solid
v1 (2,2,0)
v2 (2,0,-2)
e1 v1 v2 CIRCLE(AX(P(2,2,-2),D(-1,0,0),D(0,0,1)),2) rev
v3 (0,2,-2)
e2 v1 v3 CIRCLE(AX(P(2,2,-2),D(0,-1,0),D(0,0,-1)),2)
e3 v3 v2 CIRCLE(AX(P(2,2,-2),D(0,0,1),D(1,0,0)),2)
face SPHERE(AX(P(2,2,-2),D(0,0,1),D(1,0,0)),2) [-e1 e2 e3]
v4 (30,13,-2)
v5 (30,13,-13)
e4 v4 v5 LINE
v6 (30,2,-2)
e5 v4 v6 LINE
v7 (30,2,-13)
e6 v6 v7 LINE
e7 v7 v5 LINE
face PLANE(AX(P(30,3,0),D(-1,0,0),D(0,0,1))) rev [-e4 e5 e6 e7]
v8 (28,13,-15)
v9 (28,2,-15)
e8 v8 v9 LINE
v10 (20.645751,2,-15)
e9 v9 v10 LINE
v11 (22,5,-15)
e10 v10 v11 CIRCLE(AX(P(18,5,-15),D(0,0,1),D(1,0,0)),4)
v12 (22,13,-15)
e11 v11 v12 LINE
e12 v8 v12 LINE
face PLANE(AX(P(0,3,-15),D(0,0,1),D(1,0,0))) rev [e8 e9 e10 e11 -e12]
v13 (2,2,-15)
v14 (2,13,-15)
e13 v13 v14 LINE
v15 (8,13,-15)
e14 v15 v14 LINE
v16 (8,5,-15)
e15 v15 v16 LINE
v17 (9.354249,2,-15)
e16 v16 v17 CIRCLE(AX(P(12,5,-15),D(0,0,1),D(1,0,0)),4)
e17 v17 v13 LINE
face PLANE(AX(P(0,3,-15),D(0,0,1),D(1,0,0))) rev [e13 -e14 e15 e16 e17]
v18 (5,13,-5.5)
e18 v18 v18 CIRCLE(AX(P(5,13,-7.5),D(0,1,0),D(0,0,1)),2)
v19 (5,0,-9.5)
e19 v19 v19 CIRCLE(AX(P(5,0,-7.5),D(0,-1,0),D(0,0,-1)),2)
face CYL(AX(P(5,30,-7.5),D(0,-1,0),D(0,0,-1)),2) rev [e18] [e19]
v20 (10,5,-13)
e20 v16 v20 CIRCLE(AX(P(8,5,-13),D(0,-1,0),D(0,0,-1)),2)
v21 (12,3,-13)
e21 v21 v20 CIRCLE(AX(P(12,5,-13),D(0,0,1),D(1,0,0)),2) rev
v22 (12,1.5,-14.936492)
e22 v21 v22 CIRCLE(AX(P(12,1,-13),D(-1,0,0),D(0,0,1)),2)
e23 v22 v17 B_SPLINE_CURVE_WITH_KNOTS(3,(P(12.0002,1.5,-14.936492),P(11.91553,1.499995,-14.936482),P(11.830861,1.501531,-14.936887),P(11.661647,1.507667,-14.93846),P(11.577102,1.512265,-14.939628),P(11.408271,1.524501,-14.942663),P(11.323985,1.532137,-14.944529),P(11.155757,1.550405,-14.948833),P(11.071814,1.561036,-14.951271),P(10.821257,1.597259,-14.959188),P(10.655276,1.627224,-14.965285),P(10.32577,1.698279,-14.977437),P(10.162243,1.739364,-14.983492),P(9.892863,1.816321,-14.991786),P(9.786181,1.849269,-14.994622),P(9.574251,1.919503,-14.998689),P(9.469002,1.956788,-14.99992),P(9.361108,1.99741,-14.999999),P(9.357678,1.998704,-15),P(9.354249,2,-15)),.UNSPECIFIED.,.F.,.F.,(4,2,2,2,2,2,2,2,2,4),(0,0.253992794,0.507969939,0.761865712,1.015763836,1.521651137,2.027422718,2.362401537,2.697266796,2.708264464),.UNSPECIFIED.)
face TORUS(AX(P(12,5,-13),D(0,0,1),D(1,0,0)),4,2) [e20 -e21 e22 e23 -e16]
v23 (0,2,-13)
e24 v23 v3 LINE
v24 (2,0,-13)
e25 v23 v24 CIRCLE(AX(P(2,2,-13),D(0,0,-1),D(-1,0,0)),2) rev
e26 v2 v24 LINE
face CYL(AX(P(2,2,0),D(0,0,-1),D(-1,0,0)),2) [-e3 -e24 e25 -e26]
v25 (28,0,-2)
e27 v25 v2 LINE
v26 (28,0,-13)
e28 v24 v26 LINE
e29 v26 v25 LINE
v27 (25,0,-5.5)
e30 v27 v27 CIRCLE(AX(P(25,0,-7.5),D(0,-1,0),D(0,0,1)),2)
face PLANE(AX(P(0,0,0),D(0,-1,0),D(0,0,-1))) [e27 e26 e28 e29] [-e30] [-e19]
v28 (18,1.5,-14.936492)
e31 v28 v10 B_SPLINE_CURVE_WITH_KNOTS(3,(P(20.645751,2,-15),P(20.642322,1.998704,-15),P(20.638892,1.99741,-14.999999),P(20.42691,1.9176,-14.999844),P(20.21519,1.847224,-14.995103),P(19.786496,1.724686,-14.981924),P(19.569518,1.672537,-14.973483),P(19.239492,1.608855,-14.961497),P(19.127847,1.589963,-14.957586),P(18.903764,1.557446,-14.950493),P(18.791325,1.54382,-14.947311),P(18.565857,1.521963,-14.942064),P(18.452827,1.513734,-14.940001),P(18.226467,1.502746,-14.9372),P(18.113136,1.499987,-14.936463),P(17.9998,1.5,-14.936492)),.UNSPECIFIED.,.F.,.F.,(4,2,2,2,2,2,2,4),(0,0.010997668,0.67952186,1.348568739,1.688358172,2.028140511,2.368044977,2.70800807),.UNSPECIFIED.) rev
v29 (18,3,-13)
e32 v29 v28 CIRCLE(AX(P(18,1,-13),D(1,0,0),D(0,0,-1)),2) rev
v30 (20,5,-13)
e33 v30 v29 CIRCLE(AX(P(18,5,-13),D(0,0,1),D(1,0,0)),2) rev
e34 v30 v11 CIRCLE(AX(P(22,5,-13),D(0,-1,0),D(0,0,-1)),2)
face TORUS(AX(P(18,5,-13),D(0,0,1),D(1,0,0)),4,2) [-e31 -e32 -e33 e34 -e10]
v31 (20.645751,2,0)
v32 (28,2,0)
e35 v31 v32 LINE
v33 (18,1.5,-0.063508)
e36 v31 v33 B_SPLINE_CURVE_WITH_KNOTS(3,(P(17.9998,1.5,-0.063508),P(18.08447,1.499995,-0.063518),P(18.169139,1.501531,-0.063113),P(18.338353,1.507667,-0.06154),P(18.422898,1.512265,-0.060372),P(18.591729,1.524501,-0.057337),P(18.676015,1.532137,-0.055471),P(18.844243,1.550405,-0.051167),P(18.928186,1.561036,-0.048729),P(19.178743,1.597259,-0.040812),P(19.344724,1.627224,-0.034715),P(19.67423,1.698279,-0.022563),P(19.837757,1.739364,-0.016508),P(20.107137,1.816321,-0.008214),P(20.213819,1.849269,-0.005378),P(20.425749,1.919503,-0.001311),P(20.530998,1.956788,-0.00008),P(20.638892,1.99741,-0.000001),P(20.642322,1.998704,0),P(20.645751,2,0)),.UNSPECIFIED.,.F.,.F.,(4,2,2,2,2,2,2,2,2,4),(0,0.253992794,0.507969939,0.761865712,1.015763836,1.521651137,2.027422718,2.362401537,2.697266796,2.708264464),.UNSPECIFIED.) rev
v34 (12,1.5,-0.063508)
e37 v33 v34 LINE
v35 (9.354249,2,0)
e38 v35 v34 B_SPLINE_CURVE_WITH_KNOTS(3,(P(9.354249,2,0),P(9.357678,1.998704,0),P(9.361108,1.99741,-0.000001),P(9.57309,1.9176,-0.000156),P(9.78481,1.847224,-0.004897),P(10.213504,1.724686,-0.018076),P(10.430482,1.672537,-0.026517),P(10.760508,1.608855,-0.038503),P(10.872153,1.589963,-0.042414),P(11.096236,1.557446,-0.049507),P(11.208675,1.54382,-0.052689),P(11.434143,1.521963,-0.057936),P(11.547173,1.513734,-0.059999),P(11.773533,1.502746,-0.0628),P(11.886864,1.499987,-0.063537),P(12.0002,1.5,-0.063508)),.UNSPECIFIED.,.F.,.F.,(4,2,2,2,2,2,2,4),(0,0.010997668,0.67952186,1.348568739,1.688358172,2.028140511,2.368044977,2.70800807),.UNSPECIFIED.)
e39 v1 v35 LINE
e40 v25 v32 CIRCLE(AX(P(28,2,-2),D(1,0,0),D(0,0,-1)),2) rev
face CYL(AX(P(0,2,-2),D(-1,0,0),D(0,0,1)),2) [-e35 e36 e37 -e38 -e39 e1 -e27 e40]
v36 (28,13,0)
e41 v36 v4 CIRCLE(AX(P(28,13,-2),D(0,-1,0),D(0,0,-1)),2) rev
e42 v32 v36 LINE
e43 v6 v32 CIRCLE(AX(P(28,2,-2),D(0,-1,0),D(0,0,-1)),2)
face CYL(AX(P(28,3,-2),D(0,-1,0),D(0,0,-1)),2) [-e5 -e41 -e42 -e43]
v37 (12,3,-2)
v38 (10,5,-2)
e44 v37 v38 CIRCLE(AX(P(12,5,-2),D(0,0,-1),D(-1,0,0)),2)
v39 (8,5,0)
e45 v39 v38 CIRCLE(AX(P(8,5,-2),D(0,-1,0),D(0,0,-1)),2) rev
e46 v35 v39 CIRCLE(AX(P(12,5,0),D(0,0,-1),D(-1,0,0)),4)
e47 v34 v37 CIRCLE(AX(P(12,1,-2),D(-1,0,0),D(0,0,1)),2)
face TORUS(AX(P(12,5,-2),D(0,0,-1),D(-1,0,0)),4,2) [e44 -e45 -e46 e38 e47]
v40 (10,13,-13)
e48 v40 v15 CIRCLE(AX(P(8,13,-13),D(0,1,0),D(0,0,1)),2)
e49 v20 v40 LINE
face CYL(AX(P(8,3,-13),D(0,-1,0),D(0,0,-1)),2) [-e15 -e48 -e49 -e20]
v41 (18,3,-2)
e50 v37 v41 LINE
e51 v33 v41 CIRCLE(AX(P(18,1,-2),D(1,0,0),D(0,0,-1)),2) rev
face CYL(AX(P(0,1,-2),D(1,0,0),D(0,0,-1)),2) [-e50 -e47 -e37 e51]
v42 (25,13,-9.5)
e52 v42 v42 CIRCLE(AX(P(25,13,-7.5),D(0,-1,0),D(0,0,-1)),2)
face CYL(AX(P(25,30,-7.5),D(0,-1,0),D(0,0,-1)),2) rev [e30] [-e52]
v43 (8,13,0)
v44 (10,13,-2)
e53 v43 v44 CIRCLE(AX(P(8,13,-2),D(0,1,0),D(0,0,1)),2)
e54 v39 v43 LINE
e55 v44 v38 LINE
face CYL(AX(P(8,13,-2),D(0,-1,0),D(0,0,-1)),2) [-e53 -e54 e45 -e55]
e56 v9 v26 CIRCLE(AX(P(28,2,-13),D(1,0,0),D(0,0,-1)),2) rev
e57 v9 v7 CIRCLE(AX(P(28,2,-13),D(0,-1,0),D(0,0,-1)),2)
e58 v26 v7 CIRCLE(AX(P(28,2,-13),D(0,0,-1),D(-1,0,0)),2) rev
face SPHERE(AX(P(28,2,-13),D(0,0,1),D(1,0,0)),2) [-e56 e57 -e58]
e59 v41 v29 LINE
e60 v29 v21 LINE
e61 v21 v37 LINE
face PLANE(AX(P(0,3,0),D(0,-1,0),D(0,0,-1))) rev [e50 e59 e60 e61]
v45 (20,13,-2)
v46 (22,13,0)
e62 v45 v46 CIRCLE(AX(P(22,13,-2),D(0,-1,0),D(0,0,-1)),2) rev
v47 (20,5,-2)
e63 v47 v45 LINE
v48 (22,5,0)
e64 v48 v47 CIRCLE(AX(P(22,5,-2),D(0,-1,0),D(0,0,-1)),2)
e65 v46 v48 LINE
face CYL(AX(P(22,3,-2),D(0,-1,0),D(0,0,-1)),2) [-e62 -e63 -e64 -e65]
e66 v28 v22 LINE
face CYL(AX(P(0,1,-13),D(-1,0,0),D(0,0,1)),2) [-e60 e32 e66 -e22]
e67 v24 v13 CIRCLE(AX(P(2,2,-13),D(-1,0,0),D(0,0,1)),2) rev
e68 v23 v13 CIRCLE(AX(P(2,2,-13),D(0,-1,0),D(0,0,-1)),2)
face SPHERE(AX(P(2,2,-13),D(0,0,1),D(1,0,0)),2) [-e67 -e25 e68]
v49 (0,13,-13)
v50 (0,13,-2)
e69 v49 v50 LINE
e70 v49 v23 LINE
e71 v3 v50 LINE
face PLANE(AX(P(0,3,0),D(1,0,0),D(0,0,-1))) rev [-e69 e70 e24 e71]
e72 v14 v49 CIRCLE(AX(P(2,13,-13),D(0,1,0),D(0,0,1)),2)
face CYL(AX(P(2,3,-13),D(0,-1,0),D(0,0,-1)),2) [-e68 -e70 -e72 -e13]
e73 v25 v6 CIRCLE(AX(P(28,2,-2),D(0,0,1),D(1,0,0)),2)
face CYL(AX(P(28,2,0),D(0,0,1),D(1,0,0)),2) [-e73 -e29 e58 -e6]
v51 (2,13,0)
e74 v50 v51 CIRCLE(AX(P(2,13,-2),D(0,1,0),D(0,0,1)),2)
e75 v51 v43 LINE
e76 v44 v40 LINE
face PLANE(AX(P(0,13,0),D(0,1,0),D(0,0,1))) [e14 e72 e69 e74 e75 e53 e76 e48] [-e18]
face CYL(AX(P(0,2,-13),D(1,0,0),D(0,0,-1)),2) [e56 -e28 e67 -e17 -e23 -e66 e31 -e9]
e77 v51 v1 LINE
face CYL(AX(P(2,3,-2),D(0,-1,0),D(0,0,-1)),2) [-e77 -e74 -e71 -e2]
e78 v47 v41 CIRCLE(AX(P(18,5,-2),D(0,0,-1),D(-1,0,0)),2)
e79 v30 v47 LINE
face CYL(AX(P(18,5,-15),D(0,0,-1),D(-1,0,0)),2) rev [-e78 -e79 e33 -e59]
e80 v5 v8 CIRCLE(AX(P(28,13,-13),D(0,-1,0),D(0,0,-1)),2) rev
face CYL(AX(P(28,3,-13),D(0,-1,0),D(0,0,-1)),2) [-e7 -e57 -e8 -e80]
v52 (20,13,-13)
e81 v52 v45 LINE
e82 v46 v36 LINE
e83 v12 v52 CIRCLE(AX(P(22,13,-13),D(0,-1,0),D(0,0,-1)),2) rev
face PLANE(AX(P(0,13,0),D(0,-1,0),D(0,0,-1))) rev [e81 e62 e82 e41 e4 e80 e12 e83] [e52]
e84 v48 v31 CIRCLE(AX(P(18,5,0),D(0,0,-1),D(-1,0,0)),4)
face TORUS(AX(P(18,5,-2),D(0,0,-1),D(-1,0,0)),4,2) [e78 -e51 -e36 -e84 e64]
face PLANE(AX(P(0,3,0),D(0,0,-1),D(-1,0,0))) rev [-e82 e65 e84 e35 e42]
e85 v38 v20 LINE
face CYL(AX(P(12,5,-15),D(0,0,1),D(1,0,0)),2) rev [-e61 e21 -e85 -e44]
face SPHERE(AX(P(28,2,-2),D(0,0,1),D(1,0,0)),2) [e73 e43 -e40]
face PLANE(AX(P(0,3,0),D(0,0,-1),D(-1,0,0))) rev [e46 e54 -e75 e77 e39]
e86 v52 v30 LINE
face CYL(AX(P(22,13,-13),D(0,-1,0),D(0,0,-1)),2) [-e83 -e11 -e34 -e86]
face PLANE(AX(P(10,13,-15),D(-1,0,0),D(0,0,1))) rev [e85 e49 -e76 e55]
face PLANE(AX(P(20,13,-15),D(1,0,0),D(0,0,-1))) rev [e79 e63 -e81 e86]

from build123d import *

# Parameters (mm, degrees)
SKETCH1_W           = 30
SKETCH1_H           = 15
BOSS_EXTRUDE1_DEPTH = 3
SKETCH2_W           = 10
SKETCH2_H           = 15
BOSS_EXTRUDE2_DEPTH = 10
SKETCH3_R           = 2
CUT_EXTRUDE1_DEPTH  = 30
FILLET1_R           = 2


with BuildPart() as part:
    # Sketch1 → Boss-Extrude1 (new body)
    with BuildSketch(Plane(origin=(0, 0, 0), x_dir=(1, 0, 0), z_dir=(0, 1, 0))):
        with Locations((15, 7.5)):
            Rectangle(SKETCH1_W, SKETCH1_H)
    extrude(amount=BOSS_EXTRUDE1_DEPTH)

    # Sketch2 → Boss-Extrude2 (add)
    with BuildSketch(Plane(origin=(0, 3, 0), x_dir=(1, 0, 0), z_dir=(0, 1, 0))):
        with Locations((5, 7.5)):
            Rectangle(SKETCH2_W, SKETCH2_H)
        with Locations((25, 7.5)):
            Rectangle(SKETCH2_W, SKETCH2_H)
    extrude(amount=BOSS_EXTRUDE2_DEPTH)

    # Sketch3 → Cut-Extrude1 (cut)
    with BuildSketch(Plane.XZ):
        with Locations(Location((5, -7.5, 0), (0, 0, 270))):
            Circle(SKETCH3_R)
        with Locations(Location((25, -7.5, 0), (0, 0, 270))):
            Circle(SKETCH3_R)
    extrude(amount=-CUT_EXTRUDE1_DEPTH, mode=Mode.SUBTRACT)

    # Fillet1
    # the kernel refuses this fillet: 2 mm, written as the material it adds along each edge
    with BuildSketch(Plane(origin=(10, 3, -15), x_dir=(0, 1, 0), z_dir=(0, 0, 1)), Plane(origin=(20, 3, -15), x_dir=(-1, 0, 0), z_dir=(0, 0, 1))) as fillet1_piece_1:
        with BuildLine():
            CenterArc((FILLET1_R, -FILLET1_R), FILLET1_R, 90, 90)
            Line((0, -FILLET1_R), (0, 0))
            Line((0, 0), (FILLET1_R, 0))
        make_face()
    extrude(amount=15)
    # the kernel refuses this fillet: 2 mm, written as the material it takes off along each edge
    with BuildSketch(Plane(origin=(28, 2, -13), x_dir=(0, 0, -1), z_dir=(0, -1, 0))) as fillet1_2_piece_1_section:
        Polygon((0, 0), (FILLET1_R, 0), (FILLET1_R, FILLET1_R), (0, FILLET1_R), align=None)
    fillet1_2_piece_1 = extrude(amount=FILLET1_R, mode=Mode.PRIVATE)
    fillet1_2_piece_1 = fillet1_2_piece_1 - Plane(origin=(28, 2, -13), x_dir=(-0.7071067811865475, 0, 0.7071067811865475), z_dir=(0, -1, 0)) * Sphere(FILLET1_R, mode=Mode.PRIVATE)
    add(fillet1_2_piece_1, mode=Mode.SUBTRACT)
    with BuildSketch(Plane(origin=(2, 2, -13), x_dir=(0, 0, -1), z_dir=(0, -1, 0))) as fillet1_2_piece_2_section:
        Polygon((0, 0), (FILLET1_R, 0), (FILLET1_R, -FILLET1_R), (0, -FILLET1_R), align=None)
    fillet1_2_piece_2 = extrude(amount=FILLET1_R, mode=Mode.PRIVATE)
    fillet1_2_piece_2 = fillet1_2_piece_2 - Plane(origin=(2, 2, -13), x_dir=(0.7071067811865475, 0, 0.7071067811865475), z_dir=(0, -1, 0)) * Sphere(FILLET1_R, mode=Mode.PRIVATE)
    add(fillet1_2_piece_2, mode=Mode.SUBTRACT)
    with BuildSketch(Plane(origin=(28, 2, -2), x_dir=(0, 0, 1), z_dir=(0, -1, 0))) as fillet1_2_piece_3_section:
        Polygon((0, 0), (FILLET1_R, 0), (FILLET1_R, -FILLET1_R), (0, -FILLET1_R), align=None)
    fillet1_2_piece_3 = extrude(amount=FILLET1_R, mode=Mode.PRIVATE)
    fillet1_2_piece_3 = fillet1_2_piece_3 - Plane(origin=(28, 2, -2), x_dir=(-0.7071067811865475, 0, -0.7071067811865475), z_dir=(0, -1, 0)) * Sphere(FILLET1_R, mode=Mode.PRIVATE)
    add(fillet1_2_piece_3, mode=Mode.SUBTRACT)
    with BuildSketch(Plane(origin=(2, 2, -2), x_dir=(0, -1, 0), z_dir=(0, 0, 1))) as fillet1_2_piece_4_section:
        Polygon((0, 0), (FILLET1_R, 0), (FILLET1_R, -FILLET1_R), (0, -FILLET1_R), align=None)
    fillet1_2_piece_4 = extrude(amount=FILLET1_R, mode=Mode.PRIVATE)
    fillet1_2_piece_4 = fillet1_2_piece_4 - Plane(origin=(2, 2, -2), x_dir=(0.7071067811865475, 0.7071067811865475, 0), z_dir=(0, 0, 1)) * Sphere(FILLET1_R, mode=Mode.PRIVATE)
    add(fillet1_2_piece_4, mode=Mode.SUBTRACT)
    with BuildSketch(Plane(origin=(28, 0, -15), x_dir=(0, 0, 1), z_dir=(-1, 0, 0))) as fillet1_2_piece_5:
        with BuildLine():
            CenterArc((FILLET1_R, FILLET1_R), FILLET1_R, 180, 90)
            Line((0, FILLET1_R), (0, 0))
            Line((0, 0), (FILLET1_R, 0))
        make_face()
    extrude(amount=26, mode=Mode.SUBTRACT)
    with BuildSketch(Plane(origin=(30, 0, -2), x_dir=(0, 1, 0), z_dir=(0, 0, -1)), Plane(origin=(0, 0, -13), x_dir=(0, 1, 0), z_dir=(0, 0, 1))) as fillet1_2_piece_6:
        with BuildLine():
            CenterArc((FILLET1_R, -FILLET1_R), FILLET1_R, 90, 90)
            Line((0, -FILLET1_R), (0, 0))
            Line((0, 0), (FILLET1_R, 0))
        make_face()
    extrude(amount=11, mode=Mode.SUBTRACT)
    with BuildSketch(Plane(origin=(2, 0, 0), x_dir=(0, 1, 0), z_dir=(1, 0, 0))) as fillet1_2_piece_7:
        with BuildLine():
            CenterArc((FILLET1_R, -FILLET1_R), FILLET1_R, 90, 90)
            Line((0, -FILLET1_R), (0, 0))
            Line((0, 0), (FILLET1_R, 0))
        make_face()
    extrude(amount=26, mode=Mode.SUBTRACT)
    with BuildSketch(Plane(origin=(0, 18, -15), x_dir=(0, 0, 1), z_dir=(0, -1, 0)), Plane(origin=(30, 2, -15), x_dir=(0, 0, 1), z_dir=(0, 1, 0)), Plane(origin=(30, 2, 0), x_dir=(-1, 0, 0), z_dir=(0, 1, 0)), Plane(origin=(0, 18, 0), x_dir=(1, 0, 0), z_dir=(0, -1, 0))) as fillet1_2_piece_8:
        with BuildLine():
            CenterArc((FILLET1_R, -FILLET1_R), FILLET1_R, 90, 90)
            Line((0, -FILLET1_R), (0, 0))
            Line((0, 0), (FILLET1_R, 0))
        make_face()
    extrude(amount=16, mode=Mode.SUBTRACT)
    # the kernel refuses this fillet: 2 mm, written as the material it takes off along each edge
    with BuildSketch(Plane(origin=(12, 3, 0), x_dir=(0, -1, 0), z_dir=(1, 0, 0))) as fillet1_3_piece_1:
        with BuildLine():
            CenterArc((FILLET1_R, FILLET1_R), FILLET1_R, 180, 90)
            Line((0, FILLET1_R), (0, 0))
            Line((0, 0), (FILLET1_R, 0))
        make_face()
    extrude(amount=6, mode=Mode.SUBTRACT)
    with BuildSketch(Plane(origin=(10, 5, 0), x_dir=(-1, 0, 0), z_dir=(0, 1, 0)), Plane(origin=(10, 5, -15), x_dir=(0, 0, 1), z_dir=(0, 1, 0))) as fillet1_3_piece_2:
        with BuildLine():
            CenterArc((FILLET1_R, -FILLET1_R), FILLET1_R, 90, 90)
            Line((0, -FILLET1_R), (0, 0))
            Line((0, 0), (FILLET1_R, 0))
        make_face()
    extrude(amount=13, mode=Mode.SUBTRACT)
    with BuildSketch(Plane(origin=(18, 3, -15), x_dir=(0, 0, 1), z_dir=(-1, 0, 0))) as fillet1_3_piece_3:
        with BuildLine():
            CenterArc((FILLET1_R, -FILLET1_R), FILLET1_R, 90, 90)
            Line((0, -FILLET1_R), (0, 0))
            Line((0, 0), (FILLET1_R, 0))
        make_face()
    extrude(amount=6, mode=Mode.SUBTRACT)
    with BuildSketch(Plane(origin=(20, 5, -15), x_dir=(0, 0, 1), z_dir=(0, 1, 0)), Plane(origin=(20, 5, 0), x_dir=(1, 0, 0), z_dir=(0, 1, 0))) as fillet1_3_piece_4:
        with BuildLine():
            CenterArc((FILLET1_R, FILLET1_R), FILLET1_R, 180, 90)
            Line((0, FILLET1_R), (0, 0))
            Line((0, 0), (FILLET1_R, 0))
        make_face()
    extrude(amount=13, mode=Mode.SUBTRACT)
    with BuildSketch(Plane(origin=(18, 5, 0), x_dir=(0, -1, 0), z_dir=(-1, 0, 0))) as fillet1_3_piece_5:
        with BuildLine():
            CenterArc((2 + FILLET1_R, -FILLET1_R), FILLET1_R, 90, 90)
            Line((2, -FILLET1_R), (2, 0))
            Line((2, 0), (2 + FILLET1_R, 0))
        make_face()
    revolve(axis=Axis((18, 5, 0), (0, 0, 1)), revolution_arc=90, mode=Mode.SUBTRACT)
    with BuildSketch(Plane(origin=(18, 5, -15), x_dir=(0, -1, 0), z_dir=(-1, 0, 0))) as fillet1_3_piece_6:
        with BuildLine():
            CenterArc((2 + FILLET1_R, FILLET1_R), FILLET1_R, 180, 90)
            Line((2 + FILLET1_R, 0), (2, 0))
            Line((2, 0), (2, FILLET1_R))
        make_face()
    revolve(axis=Axis((18, 5, -15), (0, 0, 1)), revolution_arc=90, mode=Mode.SUBTRACT)
    with BuildSketch(Plane(origin=(12, 5, -15), x_dir=(-1, 0, 0), z_dir=(0, 1, 0))) as fillet1_3_piece_7:
        with BuildLine():
            CenterArc((2 + FILLET1_R, FILLET1_R), FILLET1_R, 180, 90)
            Line((2 + FILLET1_R, 0), (2, 0))
            Line((2, 0), (2, FILLET1_R))
        make_face()
    revolve(axis=Axis((12, 5, -15), (0, 0, 1)), revolution_arc=90, mode=Mode.SUBTRACT)
    with BuildSketch(Plane(origin=(12, 5, 0), x_dir=(-1, 0, 0), z_dir=(0, 1, 0))) as fillet1_3_piece_8:
        with BuildLine():
            CenterArc((2 + FILLET1_R, -FILLET1_R), FILLET1_R, 90, 90)
            Line((2, -FILLET1_R), (2, 0))
            Line((2, 0), (2 + FILLET1_R, 0))
        make_face()
    revolve(axis=Axis((12, 5, 0), (0, 0, 1)), revolution_arc=90, mode=Mode.SUBTRACT)


solid = part.part
